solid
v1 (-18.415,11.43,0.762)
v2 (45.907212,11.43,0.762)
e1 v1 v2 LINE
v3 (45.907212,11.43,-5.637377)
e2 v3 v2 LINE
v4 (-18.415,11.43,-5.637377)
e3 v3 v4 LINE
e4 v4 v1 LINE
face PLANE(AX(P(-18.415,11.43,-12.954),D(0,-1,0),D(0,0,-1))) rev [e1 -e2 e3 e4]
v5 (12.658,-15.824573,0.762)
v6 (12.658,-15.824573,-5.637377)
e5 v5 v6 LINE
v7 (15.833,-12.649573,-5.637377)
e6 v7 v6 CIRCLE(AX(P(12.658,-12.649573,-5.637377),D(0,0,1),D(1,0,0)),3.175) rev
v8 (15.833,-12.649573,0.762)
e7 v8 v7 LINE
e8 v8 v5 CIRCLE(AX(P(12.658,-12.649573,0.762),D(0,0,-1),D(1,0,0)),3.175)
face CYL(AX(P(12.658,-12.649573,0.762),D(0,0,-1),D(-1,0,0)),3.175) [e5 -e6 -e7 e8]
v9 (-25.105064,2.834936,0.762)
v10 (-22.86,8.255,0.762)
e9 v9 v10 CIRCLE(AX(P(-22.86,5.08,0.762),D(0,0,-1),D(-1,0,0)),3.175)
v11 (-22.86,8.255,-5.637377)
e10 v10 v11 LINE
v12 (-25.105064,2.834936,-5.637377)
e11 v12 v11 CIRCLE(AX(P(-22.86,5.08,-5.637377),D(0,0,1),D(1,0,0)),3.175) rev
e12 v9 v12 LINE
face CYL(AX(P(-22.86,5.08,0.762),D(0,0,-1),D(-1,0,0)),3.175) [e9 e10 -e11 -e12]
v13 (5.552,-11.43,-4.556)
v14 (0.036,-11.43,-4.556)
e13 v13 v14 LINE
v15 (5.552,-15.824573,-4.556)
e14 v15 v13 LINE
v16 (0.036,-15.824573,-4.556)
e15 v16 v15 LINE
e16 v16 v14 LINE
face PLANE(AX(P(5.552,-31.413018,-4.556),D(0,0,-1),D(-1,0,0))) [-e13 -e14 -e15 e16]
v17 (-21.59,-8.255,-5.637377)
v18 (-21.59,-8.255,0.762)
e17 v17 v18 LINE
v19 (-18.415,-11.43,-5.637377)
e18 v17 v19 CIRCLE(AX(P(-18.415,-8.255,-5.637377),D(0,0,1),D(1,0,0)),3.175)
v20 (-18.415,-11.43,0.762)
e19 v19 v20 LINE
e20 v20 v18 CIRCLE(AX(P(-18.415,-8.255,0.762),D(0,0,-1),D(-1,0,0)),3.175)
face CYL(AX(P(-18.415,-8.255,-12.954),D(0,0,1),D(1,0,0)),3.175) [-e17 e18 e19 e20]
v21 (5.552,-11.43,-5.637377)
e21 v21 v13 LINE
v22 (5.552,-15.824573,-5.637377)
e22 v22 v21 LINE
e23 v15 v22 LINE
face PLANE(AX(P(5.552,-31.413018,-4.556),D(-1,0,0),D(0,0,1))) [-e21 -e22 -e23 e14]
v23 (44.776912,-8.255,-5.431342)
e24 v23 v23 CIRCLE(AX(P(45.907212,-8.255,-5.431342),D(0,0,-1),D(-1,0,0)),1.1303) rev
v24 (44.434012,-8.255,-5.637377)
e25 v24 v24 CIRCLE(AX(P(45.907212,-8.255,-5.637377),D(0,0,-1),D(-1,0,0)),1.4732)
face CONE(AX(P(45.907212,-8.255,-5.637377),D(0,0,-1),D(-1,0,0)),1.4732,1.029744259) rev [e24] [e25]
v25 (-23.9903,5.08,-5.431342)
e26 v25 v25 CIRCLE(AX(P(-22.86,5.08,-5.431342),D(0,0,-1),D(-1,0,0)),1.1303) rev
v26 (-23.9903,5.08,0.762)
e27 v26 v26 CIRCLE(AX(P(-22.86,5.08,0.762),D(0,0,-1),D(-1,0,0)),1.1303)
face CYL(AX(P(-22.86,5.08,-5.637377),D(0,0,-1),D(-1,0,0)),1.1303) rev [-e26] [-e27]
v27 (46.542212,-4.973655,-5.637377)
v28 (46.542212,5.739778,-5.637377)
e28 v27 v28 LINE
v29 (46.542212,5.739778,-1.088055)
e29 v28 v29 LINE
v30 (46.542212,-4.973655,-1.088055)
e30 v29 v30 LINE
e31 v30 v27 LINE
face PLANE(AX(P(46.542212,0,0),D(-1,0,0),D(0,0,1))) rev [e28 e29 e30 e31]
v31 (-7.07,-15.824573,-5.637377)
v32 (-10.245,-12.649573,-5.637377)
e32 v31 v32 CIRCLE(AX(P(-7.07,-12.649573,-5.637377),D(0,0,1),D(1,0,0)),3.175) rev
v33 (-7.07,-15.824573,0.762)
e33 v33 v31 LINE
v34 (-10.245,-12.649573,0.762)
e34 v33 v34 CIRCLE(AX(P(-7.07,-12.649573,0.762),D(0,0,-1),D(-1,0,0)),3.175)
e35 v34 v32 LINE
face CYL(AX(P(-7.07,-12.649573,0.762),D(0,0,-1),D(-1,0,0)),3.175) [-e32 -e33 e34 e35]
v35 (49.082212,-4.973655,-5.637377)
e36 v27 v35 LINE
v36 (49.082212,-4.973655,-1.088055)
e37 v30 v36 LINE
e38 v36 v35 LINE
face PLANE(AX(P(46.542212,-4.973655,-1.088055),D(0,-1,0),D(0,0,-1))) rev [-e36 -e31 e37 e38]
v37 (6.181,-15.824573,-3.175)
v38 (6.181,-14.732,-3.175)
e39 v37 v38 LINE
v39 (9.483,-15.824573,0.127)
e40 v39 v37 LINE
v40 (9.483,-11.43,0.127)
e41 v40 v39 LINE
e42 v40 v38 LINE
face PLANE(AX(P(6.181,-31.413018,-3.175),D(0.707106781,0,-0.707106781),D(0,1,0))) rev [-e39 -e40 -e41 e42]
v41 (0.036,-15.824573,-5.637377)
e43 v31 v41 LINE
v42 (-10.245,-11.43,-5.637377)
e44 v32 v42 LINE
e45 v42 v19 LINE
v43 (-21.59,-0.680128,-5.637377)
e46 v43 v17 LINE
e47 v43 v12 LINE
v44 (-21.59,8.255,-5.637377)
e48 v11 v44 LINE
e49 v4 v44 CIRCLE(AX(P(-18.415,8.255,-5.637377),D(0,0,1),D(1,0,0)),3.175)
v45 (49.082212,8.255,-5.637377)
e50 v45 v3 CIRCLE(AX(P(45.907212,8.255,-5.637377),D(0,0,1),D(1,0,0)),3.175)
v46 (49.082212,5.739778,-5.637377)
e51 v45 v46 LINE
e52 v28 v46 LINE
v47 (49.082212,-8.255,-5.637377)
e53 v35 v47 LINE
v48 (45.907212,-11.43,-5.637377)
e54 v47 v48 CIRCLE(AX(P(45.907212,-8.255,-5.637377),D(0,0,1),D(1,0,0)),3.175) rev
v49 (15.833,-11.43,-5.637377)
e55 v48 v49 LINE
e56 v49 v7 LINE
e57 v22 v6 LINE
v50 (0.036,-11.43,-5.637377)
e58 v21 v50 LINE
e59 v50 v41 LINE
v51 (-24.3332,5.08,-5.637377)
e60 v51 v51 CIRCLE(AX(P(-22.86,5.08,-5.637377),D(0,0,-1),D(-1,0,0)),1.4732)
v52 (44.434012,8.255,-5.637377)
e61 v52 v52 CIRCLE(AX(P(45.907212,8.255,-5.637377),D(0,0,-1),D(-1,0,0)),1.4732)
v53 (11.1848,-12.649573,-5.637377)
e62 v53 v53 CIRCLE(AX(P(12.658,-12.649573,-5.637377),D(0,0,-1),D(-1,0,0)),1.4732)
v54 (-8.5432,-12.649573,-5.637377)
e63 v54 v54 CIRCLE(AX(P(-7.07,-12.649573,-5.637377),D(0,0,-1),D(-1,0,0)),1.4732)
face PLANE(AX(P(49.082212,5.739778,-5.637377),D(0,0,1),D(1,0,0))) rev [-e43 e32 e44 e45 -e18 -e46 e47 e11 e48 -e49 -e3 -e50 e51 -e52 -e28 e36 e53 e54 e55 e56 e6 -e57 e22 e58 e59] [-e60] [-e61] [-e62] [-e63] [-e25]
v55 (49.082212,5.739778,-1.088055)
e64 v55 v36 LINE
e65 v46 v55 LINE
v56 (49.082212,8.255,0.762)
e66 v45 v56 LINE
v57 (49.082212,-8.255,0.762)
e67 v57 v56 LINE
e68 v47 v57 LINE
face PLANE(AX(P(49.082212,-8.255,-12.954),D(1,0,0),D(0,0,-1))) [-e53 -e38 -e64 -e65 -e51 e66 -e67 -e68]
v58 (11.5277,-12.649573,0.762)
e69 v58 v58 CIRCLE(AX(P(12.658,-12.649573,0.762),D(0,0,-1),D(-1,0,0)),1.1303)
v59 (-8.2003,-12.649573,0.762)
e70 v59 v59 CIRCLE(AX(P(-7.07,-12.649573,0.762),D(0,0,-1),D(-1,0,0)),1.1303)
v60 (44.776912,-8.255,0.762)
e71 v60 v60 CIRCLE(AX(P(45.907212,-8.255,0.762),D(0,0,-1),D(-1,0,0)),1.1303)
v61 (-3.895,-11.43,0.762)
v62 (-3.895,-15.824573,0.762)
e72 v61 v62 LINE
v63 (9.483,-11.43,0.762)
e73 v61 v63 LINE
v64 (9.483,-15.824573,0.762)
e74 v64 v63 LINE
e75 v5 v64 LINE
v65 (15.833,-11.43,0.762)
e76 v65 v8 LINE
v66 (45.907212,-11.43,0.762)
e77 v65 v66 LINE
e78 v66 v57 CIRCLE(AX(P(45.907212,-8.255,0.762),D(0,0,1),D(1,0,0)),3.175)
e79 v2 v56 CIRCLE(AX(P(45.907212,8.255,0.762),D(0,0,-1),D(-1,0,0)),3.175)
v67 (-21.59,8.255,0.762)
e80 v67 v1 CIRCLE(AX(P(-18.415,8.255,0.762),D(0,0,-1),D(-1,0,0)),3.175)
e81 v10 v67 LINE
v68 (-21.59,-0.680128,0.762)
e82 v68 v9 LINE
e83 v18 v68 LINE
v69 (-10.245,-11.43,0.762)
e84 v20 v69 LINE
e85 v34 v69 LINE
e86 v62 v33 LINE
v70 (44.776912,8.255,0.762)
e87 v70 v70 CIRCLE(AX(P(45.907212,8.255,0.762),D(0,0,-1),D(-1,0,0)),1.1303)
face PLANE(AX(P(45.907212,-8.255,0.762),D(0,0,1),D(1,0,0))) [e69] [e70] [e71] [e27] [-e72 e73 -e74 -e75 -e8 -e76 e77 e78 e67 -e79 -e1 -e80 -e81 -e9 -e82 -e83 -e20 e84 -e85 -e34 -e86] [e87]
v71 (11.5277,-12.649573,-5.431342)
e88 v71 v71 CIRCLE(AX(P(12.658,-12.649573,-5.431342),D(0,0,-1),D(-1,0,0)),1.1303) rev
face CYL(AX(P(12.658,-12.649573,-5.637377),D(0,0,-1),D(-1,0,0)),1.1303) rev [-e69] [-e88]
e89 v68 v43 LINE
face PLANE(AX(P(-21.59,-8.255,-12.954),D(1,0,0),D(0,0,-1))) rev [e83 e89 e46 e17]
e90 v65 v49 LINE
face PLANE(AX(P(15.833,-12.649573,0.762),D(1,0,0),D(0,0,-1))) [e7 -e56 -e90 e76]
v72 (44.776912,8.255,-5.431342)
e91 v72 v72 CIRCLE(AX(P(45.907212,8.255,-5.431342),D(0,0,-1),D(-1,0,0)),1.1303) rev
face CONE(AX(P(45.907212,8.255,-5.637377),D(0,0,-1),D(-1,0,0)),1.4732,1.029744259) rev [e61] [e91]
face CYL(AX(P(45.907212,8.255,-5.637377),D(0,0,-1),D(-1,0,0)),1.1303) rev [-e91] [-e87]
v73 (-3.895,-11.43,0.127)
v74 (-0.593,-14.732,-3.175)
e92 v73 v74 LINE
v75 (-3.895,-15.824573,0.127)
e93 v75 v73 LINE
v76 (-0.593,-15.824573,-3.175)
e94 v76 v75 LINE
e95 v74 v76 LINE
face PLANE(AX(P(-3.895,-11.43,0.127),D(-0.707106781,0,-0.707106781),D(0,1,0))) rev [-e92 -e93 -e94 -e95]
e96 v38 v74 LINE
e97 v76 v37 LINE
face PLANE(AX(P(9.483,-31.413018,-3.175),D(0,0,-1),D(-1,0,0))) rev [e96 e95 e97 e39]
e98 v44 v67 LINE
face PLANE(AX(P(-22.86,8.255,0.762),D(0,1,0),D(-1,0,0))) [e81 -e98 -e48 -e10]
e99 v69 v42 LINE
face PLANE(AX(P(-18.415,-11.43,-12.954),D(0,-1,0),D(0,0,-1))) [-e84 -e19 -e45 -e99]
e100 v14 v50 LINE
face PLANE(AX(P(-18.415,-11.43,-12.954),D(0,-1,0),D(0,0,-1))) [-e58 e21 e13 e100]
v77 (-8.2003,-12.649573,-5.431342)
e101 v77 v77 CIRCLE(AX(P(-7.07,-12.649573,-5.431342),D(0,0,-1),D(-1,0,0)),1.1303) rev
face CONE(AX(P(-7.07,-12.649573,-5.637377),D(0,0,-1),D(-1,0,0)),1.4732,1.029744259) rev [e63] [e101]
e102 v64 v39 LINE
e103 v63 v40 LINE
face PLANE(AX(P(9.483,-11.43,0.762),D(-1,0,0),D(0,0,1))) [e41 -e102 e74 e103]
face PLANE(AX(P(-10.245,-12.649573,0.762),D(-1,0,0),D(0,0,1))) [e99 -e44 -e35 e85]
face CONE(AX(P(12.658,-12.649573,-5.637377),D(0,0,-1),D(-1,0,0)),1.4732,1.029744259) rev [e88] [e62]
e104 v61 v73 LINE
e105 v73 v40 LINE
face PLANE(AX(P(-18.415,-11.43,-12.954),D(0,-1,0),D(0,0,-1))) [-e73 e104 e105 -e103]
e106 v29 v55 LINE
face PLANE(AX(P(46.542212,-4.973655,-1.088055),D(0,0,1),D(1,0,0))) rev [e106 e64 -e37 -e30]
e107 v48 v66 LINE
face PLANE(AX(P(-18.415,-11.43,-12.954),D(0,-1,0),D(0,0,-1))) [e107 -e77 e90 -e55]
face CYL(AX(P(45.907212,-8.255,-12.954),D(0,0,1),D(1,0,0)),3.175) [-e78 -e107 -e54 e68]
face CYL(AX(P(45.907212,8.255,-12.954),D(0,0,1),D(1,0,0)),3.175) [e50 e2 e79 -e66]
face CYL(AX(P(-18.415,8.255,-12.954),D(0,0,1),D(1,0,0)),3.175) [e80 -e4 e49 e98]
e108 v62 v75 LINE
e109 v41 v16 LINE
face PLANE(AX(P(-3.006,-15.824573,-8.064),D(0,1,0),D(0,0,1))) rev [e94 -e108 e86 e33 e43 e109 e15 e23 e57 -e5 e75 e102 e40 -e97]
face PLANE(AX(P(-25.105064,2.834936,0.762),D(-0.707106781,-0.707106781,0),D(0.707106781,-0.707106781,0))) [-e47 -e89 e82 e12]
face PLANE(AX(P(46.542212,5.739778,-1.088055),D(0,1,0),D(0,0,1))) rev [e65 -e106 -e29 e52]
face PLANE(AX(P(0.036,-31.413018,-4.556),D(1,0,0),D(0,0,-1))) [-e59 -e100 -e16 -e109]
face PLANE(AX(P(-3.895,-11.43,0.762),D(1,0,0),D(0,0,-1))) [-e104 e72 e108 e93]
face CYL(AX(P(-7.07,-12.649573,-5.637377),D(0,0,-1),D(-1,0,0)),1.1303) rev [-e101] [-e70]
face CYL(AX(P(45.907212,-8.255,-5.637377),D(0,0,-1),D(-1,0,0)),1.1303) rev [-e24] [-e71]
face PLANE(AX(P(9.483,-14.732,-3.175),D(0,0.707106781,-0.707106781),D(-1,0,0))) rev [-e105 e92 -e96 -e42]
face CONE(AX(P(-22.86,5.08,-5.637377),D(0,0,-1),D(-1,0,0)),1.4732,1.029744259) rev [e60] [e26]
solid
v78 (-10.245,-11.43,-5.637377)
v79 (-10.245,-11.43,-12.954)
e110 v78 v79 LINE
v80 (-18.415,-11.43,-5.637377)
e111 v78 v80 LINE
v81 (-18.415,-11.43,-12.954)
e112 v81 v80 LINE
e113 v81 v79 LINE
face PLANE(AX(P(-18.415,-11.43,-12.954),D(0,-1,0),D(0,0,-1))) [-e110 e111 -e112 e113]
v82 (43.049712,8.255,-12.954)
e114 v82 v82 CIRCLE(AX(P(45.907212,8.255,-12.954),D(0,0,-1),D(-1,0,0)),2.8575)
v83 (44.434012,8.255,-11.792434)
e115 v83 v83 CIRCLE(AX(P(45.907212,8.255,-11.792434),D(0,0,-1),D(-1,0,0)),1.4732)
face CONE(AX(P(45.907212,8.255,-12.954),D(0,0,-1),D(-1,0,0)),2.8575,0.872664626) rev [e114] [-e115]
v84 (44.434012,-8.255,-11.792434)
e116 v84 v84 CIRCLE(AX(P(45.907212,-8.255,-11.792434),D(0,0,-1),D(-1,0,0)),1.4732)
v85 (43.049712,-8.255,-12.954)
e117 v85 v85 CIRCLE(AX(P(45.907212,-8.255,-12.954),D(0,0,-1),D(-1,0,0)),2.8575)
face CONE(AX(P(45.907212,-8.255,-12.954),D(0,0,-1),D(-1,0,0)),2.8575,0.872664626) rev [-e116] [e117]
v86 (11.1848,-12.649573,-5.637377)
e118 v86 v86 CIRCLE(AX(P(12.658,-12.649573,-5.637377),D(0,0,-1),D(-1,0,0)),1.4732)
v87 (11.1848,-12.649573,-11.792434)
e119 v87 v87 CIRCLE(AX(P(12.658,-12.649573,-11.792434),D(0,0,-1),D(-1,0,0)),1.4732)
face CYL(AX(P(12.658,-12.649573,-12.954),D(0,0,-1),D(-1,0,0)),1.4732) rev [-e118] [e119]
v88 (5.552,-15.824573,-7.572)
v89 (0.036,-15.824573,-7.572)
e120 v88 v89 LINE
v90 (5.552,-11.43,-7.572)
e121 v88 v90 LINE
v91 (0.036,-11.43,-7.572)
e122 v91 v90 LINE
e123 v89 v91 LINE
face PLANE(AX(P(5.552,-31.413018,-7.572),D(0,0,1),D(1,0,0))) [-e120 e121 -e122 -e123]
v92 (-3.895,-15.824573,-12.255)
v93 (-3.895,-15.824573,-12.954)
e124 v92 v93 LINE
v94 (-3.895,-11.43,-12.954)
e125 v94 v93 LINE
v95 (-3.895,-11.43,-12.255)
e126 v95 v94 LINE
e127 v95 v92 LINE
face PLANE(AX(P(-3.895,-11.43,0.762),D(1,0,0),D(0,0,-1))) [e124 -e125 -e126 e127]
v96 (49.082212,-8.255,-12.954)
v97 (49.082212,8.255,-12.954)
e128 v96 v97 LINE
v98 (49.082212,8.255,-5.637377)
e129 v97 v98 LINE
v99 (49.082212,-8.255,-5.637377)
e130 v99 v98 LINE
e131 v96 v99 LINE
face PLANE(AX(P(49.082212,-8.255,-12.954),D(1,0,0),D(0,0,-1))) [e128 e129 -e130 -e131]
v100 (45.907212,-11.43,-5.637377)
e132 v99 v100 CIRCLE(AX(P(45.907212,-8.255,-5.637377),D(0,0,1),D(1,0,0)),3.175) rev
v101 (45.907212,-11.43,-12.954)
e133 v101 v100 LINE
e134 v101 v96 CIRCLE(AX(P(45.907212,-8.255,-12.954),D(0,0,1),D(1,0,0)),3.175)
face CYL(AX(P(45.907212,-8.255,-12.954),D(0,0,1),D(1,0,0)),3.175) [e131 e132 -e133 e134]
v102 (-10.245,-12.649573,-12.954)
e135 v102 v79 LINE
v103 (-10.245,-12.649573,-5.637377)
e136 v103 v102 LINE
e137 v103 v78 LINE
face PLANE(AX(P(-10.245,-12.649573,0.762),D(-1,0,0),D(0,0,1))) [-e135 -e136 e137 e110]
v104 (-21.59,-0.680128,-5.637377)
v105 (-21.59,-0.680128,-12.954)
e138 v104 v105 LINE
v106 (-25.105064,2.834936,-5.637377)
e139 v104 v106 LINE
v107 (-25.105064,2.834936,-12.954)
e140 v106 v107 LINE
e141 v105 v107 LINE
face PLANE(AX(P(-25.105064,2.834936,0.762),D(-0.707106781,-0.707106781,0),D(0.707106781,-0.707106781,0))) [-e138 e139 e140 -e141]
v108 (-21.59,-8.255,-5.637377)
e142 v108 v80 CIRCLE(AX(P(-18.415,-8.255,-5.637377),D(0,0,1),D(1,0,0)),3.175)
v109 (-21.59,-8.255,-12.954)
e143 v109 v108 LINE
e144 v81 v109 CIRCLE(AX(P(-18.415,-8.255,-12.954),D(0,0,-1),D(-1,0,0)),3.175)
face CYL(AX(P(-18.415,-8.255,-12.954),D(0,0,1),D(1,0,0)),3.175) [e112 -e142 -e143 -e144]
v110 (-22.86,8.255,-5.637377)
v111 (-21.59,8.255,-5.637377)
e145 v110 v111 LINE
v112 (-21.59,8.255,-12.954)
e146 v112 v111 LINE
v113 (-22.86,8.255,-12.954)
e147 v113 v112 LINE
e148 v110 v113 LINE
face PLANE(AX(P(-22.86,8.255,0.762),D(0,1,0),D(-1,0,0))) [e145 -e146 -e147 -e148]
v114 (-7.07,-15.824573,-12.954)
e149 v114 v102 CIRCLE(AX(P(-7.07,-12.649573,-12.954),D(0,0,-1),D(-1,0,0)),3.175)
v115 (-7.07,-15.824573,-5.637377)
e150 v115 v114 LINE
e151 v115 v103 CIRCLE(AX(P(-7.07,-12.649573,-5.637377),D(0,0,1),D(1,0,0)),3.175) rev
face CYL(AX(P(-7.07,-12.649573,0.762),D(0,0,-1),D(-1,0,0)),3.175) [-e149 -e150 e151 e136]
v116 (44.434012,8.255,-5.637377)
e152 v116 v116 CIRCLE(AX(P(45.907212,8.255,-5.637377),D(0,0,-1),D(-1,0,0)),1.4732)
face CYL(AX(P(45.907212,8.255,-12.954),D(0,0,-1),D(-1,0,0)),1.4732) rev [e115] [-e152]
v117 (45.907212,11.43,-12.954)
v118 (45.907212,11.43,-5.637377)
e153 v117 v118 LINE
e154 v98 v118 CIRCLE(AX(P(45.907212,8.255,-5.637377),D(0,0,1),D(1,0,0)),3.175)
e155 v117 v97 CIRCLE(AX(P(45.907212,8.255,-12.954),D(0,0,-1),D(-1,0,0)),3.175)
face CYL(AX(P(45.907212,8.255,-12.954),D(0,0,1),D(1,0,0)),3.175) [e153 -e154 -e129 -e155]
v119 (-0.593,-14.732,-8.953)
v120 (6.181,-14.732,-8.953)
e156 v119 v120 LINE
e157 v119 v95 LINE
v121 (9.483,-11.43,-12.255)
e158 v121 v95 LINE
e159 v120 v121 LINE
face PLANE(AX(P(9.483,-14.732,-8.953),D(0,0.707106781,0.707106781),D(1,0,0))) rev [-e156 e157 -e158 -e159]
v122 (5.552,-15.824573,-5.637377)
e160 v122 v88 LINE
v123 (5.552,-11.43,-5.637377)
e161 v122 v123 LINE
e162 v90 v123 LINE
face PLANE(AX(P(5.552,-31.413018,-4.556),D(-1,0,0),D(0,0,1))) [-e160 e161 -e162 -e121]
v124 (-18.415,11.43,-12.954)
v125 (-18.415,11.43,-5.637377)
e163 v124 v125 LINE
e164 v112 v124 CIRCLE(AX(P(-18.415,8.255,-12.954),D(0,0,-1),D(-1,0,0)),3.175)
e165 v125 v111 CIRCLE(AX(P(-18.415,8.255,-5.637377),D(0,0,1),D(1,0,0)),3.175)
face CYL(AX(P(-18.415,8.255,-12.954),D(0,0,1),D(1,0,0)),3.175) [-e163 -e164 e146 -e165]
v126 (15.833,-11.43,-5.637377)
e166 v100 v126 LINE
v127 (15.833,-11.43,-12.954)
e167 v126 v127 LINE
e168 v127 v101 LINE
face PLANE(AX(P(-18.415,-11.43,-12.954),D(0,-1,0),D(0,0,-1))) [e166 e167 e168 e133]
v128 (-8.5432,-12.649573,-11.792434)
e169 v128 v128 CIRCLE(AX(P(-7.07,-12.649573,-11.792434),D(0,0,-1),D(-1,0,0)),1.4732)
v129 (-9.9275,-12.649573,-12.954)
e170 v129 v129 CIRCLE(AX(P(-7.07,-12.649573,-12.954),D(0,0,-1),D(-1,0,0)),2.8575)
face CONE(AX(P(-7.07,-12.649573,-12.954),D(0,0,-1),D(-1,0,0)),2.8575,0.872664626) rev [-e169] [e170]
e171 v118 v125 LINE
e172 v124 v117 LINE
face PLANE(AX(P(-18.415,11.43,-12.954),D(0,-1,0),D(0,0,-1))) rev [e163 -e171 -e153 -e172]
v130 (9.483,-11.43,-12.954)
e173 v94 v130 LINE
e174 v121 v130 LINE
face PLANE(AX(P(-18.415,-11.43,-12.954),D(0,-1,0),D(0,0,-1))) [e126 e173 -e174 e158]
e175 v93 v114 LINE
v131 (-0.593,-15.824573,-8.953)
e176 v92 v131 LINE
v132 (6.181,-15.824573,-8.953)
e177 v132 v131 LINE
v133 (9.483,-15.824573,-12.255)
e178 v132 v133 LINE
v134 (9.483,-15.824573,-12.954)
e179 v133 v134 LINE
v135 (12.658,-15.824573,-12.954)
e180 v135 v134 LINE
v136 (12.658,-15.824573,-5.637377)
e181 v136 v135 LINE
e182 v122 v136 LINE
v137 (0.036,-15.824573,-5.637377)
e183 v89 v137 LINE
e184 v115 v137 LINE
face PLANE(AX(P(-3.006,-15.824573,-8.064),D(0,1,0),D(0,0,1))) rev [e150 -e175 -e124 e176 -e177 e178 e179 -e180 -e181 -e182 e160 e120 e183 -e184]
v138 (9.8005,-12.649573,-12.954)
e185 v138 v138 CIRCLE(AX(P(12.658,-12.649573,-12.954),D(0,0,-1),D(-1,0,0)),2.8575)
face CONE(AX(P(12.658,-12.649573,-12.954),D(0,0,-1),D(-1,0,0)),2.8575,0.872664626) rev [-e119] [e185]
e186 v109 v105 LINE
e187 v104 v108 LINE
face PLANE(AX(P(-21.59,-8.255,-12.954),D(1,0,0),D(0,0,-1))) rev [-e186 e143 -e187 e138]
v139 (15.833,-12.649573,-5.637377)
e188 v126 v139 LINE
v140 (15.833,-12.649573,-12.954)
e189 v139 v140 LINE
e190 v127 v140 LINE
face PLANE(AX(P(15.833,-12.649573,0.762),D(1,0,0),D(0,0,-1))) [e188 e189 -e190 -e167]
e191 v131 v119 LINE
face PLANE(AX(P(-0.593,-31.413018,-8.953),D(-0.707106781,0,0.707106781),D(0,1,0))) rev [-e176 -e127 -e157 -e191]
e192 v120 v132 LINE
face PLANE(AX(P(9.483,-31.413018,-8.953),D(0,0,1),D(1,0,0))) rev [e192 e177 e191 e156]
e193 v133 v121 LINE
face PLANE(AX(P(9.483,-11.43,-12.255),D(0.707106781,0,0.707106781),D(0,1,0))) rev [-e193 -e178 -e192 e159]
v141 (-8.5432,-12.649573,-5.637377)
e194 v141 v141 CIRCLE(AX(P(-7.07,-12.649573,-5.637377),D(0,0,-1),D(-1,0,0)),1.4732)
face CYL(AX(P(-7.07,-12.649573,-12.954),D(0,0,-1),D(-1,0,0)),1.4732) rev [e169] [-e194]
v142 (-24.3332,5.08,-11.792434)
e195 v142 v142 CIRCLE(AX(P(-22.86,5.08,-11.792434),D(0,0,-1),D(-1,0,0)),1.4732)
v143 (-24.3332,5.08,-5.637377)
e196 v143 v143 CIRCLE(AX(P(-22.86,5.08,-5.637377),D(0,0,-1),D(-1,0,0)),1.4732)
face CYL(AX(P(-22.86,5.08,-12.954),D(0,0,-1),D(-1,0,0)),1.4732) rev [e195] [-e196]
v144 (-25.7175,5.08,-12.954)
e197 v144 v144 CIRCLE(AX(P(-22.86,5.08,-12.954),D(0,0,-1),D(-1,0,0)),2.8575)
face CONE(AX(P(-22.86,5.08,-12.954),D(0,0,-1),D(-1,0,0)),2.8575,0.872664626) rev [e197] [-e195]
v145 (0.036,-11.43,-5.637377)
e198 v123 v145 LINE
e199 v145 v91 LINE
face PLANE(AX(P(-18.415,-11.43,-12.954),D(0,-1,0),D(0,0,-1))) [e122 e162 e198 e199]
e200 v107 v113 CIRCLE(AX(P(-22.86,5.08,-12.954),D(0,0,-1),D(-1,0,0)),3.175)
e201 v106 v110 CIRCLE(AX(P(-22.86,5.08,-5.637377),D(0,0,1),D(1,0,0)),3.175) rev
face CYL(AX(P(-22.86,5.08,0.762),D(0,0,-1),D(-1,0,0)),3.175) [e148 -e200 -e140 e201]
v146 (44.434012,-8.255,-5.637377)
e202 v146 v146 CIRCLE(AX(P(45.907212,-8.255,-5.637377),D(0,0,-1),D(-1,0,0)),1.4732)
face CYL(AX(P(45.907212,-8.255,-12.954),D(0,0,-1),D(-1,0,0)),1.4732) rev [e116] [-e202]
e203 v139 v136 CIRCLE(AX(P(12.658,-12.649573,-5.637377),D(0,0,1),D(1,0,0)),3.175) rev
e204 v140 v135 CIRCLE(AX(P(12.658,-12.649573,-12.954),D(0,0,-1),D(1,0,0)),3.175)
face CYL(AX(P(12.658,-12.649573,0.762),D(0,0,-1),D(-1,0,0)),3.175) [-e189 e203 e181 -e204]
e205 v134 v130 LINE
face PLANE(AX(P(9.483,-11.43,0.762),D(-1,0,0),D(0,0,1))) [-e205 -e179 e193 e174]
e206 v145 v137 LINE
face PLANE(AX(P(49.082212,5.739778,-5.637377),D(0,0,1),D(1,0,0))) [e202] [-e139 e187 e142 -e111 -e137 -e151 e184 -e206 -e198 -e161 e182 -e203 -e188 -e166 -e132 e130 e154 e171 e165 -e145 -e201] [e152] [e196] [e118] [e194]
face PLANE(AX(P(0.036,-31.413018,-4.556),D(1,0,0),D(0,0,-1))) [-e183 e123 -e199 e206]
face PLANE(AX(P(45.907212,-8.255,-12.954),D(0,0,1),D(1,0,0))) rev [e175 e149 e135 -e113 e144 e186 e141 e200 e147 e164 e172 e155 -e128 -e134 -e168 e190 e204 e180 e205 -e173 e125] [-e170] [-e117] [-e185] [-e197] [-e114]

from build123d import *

# Parameters (mm, degrees)
BOSS_EXTRUDE1_START                               = 0.762
BOSS_EXTRUDE1_DEPTH                               = 13.716
SKETCH2_W                                         = 4.549322437
SKETCH2_H                                         = 10.713432518
CUT_EXTRUDE1_DEPTH                                = 2.54
SKETCH3_W                                         = 13.378
SKETCH3_H                                         = 5.778
SKETCH3_W_2                                       = 5.516
SKETCH3_H_2                                       = 3.016
BOSS_EXTRUDE2_DEPTH                               = 4.39457265
BOSS_EXTRUDE3_DEPTH                               = 13.716
CSK_FOR_4_FLAT_HEAD_MACHINE_SCREW_100_D           = 2.9464
CSK_FOR_4_FLAT_HEAD_MACHINE_SCREW_100_DEPTH       = 7.316622713
CSK_FOR_4_FLAT_HEAD_MACHINE_SCREW_100_CSINK_D     = 5.715
CSK_FOR_4_FLAT_HEAD_MACHINE_SCREW_100_CSINK_ANGLE = 100
CSK_FOR_4_FLAT_HEAD_MACHINE_SCREW_100_TIP         = 0.885187864
TAP_DRILL_FOR_4_40_TAP1_D                         = 2.2606
CHAMFER2_SIZE                                     = 3.302


# Read off the part's stored shape, not the designer's step: Split1
with BuildPart() as part:
    # Sketch1 → Boss-Extrude1 (new body)
    with BuildSketch(Plane.XY.offset(BOSS_EXTRUDE1_START)):
        with BuildLine():
            Line((-18.415, 11.43), (45.907212097, 11.43))
            ThreePointArc((45.907212097, 11.43), (48.152276127, 10.50006403), (49.082212097, 8.255))
            Line((49.082212097, 8.255), (49.082212097, -8.255))
            ThreePointArc((49.082212097, -8.255), (48.152276127, -10.50006403), (45.907212097, -11.43))
            Line((45.907212097, -11.43), (-18.415, -11.43))
            ThreePointArc((-18.415, -11.43), (-20.66006403, -10.50006403), (-21.59, -8.255))
            Line((-21.59, -8.255), (-21.59, 8.255))
            ThreePointArc((-21.59, 8.255), (-20.66006403, 10.50006403), (-18.415, 11.43))
        make_face()
    extrude(amount=-BOSS_EXTRUDE1_DEPTH)

    # Sketch2 → Cut-Extrude1 (cut)
    with BuildSketch(Plane(origin=(49.082212097, 0, 0), x_dir=(0, 0, -1), z_dir=(1, 0, 0))):
        with Locations((3.362716069, 0.383061409)):
            Rectangle(SKETCH2_W, SKETCH2_H)
    extrude(amount=-CUT_EXTRUDE1_DEPTH, mode=Mode.SUBTRACT)

    # Sketch3 → Boss-Extrude2 (add)
    with BuildSketch(Plane.XZ.offset(11.43)):
        with Locations((2.794, -6.064)):
            Rectangle(SKETCH3_W, SKETCH3_H)
        with Locations((2.794, -6.064)):
            Rectangle(SKETCH3_W_2, SKETCH3_H_2, mode=Mode.SUBTRACT)
    extrude(amount=BOSS_EXTRUDE2_DEPTH)

    # Sketch6 → Boss-Extrude3 (add, through all)
    with BuildSketch(Plane(origin=(0, 0, -12.954), x_dir=(-1, 0, 0), z_dir=(0, 0, -1))):
        with BuildLine():
            Line((22.86, 8.255), (21.59, 8.255))
            Line((21.59, 8.255), (21.59, 1.905))
            Line((21.59, 1.905), (21.59, -0.680128061))
            Line((21.59, -0.680128061), (25.10506403, 2.83493597))
            ThreePointArc((25.10506403, 2.83493597), (25.793317516, 6.295019898), (22.86, 8.255))
        make_face()
        with BuildLine():
            Line((7.07, -15.82457265), (3.895, -15.82457265))
            Line((3.895, -15.82457265), (3.895, -11.43))
            Line((3.895, -11.43), (10.245, -11.43))
            Line((10.245, -11.43), (10.245, -12.64957265))
            ThreePointArc((10.245, -12.64957265), (9.31506403, -14.89463668), (7.07, -15.82457265))
        make_face()
        with BuildLine():
            Line((-9.483, -11.43), (-9.483, -15.82457265))
            Line((-9.483, -15.82457265), (-12.658, -15.82457265))
            ThreePointArc((-12.658, -15.82457265), (-14.90306403, -14.89463668), (-15.833, -12.64957265))
            Line((-15.833, -12.64957265), (-15.833, -11.43))
            Line((-15.833, -11.43), (-9.483, -11.43))
        make_face()
    extrude(amount=-BOSS_EXTRUDE3_DEPTH)

    # CSK for #4 Flat Head Machine Screw (100)1
    with Locations(Plane(origin=(0, 0, -12.954), x_dir=(-1, 0, 0), z_dir=(0, 0, -1))):
        with Locations((-45.907212097, -8.255), (-45.907212097, 8.255), (7.07, -12.64957265), (22.86, 5.08), (-12.658, -12.64957265)):
            CounterSinkHole(CSK_FOR_4_FLAT_HEAD_MACHINE_SCREW_100_D / 2, CSK_FOR_4_FLAT_HEAD_MACHINE_SCREW_100_CSINK_D / 2, depth=CSK_FOR_4_FLAT_HEAD_MACHINE_SCREW_100_DEPTH, counter_sink_angle=CSK_FOR_4_FLAT_HEAD_MACHINE_SCREW_100_CSINK_ANGLE)
            with Locations((0, 0, -(CSK_FOR_4_FLAT_HEAD_MACHINE_SCREW_100_DEPTH + CSK_FOR_4_FLAT_HEAD_MACHINE_SCREW_100_TIP / 2))):  # 118° drill point
                Cone(0, CSK_FOR_4_FLAT_HEAD_MACHINE_SCREW_100_D / 2, CSK_FOR_4_FLAT_HEAD_MACHINE_SCREW_100_TIP, mode=Mode.SUBTRACT)

    # Tap Drill for #4-40 Tap1 (through all)
    with Locations(Plane(origin=(0, 0, -5.637377287), x_dir=(-1, 0, 0), z_dir=(0, 0, -1))):
        with Locations((-45.907212097, 8.255), (-45.907212097, -8.255), (22.86, 5.08), (7.07, -12.64957265), (-12.658, -12.64957265)):
            Hole(TAP_DRILL_FOR_4_40_TAP1_D / 2)

    # Chamfer2
    chamfer2_edges = [part.edges().sort_by_distance(p)[0] for p in [
        (9.483, -13.627286325, -8.953),
        (9.483, -13.627286325, -3.175),
        (2.794, -11.43, -3.175),
        (-3.895, -13.627286325, -3.175),
        (-3.895, -13.627286325, -8.953),
        (2.794, -11.43, -8.953),
    ]]
    chamfer(chamfer2_edges, length=CHAMFER2_SIZE)


with BuildPart() as body_2:
    # Split1: the piece on the far side of the plane
    add(part.part)
    split(bisect_by=Plane.XY.offset(-5.637377287), keep=Keep.BOTTOM)


with BuildPart() as part_1:
    add(part.part)

    # Split1
    split(bisect_by=Plane.XY.offset(-5.637377287), keep=Keep.TOP)


solid = Compound([body_2.part, part_1.part])
